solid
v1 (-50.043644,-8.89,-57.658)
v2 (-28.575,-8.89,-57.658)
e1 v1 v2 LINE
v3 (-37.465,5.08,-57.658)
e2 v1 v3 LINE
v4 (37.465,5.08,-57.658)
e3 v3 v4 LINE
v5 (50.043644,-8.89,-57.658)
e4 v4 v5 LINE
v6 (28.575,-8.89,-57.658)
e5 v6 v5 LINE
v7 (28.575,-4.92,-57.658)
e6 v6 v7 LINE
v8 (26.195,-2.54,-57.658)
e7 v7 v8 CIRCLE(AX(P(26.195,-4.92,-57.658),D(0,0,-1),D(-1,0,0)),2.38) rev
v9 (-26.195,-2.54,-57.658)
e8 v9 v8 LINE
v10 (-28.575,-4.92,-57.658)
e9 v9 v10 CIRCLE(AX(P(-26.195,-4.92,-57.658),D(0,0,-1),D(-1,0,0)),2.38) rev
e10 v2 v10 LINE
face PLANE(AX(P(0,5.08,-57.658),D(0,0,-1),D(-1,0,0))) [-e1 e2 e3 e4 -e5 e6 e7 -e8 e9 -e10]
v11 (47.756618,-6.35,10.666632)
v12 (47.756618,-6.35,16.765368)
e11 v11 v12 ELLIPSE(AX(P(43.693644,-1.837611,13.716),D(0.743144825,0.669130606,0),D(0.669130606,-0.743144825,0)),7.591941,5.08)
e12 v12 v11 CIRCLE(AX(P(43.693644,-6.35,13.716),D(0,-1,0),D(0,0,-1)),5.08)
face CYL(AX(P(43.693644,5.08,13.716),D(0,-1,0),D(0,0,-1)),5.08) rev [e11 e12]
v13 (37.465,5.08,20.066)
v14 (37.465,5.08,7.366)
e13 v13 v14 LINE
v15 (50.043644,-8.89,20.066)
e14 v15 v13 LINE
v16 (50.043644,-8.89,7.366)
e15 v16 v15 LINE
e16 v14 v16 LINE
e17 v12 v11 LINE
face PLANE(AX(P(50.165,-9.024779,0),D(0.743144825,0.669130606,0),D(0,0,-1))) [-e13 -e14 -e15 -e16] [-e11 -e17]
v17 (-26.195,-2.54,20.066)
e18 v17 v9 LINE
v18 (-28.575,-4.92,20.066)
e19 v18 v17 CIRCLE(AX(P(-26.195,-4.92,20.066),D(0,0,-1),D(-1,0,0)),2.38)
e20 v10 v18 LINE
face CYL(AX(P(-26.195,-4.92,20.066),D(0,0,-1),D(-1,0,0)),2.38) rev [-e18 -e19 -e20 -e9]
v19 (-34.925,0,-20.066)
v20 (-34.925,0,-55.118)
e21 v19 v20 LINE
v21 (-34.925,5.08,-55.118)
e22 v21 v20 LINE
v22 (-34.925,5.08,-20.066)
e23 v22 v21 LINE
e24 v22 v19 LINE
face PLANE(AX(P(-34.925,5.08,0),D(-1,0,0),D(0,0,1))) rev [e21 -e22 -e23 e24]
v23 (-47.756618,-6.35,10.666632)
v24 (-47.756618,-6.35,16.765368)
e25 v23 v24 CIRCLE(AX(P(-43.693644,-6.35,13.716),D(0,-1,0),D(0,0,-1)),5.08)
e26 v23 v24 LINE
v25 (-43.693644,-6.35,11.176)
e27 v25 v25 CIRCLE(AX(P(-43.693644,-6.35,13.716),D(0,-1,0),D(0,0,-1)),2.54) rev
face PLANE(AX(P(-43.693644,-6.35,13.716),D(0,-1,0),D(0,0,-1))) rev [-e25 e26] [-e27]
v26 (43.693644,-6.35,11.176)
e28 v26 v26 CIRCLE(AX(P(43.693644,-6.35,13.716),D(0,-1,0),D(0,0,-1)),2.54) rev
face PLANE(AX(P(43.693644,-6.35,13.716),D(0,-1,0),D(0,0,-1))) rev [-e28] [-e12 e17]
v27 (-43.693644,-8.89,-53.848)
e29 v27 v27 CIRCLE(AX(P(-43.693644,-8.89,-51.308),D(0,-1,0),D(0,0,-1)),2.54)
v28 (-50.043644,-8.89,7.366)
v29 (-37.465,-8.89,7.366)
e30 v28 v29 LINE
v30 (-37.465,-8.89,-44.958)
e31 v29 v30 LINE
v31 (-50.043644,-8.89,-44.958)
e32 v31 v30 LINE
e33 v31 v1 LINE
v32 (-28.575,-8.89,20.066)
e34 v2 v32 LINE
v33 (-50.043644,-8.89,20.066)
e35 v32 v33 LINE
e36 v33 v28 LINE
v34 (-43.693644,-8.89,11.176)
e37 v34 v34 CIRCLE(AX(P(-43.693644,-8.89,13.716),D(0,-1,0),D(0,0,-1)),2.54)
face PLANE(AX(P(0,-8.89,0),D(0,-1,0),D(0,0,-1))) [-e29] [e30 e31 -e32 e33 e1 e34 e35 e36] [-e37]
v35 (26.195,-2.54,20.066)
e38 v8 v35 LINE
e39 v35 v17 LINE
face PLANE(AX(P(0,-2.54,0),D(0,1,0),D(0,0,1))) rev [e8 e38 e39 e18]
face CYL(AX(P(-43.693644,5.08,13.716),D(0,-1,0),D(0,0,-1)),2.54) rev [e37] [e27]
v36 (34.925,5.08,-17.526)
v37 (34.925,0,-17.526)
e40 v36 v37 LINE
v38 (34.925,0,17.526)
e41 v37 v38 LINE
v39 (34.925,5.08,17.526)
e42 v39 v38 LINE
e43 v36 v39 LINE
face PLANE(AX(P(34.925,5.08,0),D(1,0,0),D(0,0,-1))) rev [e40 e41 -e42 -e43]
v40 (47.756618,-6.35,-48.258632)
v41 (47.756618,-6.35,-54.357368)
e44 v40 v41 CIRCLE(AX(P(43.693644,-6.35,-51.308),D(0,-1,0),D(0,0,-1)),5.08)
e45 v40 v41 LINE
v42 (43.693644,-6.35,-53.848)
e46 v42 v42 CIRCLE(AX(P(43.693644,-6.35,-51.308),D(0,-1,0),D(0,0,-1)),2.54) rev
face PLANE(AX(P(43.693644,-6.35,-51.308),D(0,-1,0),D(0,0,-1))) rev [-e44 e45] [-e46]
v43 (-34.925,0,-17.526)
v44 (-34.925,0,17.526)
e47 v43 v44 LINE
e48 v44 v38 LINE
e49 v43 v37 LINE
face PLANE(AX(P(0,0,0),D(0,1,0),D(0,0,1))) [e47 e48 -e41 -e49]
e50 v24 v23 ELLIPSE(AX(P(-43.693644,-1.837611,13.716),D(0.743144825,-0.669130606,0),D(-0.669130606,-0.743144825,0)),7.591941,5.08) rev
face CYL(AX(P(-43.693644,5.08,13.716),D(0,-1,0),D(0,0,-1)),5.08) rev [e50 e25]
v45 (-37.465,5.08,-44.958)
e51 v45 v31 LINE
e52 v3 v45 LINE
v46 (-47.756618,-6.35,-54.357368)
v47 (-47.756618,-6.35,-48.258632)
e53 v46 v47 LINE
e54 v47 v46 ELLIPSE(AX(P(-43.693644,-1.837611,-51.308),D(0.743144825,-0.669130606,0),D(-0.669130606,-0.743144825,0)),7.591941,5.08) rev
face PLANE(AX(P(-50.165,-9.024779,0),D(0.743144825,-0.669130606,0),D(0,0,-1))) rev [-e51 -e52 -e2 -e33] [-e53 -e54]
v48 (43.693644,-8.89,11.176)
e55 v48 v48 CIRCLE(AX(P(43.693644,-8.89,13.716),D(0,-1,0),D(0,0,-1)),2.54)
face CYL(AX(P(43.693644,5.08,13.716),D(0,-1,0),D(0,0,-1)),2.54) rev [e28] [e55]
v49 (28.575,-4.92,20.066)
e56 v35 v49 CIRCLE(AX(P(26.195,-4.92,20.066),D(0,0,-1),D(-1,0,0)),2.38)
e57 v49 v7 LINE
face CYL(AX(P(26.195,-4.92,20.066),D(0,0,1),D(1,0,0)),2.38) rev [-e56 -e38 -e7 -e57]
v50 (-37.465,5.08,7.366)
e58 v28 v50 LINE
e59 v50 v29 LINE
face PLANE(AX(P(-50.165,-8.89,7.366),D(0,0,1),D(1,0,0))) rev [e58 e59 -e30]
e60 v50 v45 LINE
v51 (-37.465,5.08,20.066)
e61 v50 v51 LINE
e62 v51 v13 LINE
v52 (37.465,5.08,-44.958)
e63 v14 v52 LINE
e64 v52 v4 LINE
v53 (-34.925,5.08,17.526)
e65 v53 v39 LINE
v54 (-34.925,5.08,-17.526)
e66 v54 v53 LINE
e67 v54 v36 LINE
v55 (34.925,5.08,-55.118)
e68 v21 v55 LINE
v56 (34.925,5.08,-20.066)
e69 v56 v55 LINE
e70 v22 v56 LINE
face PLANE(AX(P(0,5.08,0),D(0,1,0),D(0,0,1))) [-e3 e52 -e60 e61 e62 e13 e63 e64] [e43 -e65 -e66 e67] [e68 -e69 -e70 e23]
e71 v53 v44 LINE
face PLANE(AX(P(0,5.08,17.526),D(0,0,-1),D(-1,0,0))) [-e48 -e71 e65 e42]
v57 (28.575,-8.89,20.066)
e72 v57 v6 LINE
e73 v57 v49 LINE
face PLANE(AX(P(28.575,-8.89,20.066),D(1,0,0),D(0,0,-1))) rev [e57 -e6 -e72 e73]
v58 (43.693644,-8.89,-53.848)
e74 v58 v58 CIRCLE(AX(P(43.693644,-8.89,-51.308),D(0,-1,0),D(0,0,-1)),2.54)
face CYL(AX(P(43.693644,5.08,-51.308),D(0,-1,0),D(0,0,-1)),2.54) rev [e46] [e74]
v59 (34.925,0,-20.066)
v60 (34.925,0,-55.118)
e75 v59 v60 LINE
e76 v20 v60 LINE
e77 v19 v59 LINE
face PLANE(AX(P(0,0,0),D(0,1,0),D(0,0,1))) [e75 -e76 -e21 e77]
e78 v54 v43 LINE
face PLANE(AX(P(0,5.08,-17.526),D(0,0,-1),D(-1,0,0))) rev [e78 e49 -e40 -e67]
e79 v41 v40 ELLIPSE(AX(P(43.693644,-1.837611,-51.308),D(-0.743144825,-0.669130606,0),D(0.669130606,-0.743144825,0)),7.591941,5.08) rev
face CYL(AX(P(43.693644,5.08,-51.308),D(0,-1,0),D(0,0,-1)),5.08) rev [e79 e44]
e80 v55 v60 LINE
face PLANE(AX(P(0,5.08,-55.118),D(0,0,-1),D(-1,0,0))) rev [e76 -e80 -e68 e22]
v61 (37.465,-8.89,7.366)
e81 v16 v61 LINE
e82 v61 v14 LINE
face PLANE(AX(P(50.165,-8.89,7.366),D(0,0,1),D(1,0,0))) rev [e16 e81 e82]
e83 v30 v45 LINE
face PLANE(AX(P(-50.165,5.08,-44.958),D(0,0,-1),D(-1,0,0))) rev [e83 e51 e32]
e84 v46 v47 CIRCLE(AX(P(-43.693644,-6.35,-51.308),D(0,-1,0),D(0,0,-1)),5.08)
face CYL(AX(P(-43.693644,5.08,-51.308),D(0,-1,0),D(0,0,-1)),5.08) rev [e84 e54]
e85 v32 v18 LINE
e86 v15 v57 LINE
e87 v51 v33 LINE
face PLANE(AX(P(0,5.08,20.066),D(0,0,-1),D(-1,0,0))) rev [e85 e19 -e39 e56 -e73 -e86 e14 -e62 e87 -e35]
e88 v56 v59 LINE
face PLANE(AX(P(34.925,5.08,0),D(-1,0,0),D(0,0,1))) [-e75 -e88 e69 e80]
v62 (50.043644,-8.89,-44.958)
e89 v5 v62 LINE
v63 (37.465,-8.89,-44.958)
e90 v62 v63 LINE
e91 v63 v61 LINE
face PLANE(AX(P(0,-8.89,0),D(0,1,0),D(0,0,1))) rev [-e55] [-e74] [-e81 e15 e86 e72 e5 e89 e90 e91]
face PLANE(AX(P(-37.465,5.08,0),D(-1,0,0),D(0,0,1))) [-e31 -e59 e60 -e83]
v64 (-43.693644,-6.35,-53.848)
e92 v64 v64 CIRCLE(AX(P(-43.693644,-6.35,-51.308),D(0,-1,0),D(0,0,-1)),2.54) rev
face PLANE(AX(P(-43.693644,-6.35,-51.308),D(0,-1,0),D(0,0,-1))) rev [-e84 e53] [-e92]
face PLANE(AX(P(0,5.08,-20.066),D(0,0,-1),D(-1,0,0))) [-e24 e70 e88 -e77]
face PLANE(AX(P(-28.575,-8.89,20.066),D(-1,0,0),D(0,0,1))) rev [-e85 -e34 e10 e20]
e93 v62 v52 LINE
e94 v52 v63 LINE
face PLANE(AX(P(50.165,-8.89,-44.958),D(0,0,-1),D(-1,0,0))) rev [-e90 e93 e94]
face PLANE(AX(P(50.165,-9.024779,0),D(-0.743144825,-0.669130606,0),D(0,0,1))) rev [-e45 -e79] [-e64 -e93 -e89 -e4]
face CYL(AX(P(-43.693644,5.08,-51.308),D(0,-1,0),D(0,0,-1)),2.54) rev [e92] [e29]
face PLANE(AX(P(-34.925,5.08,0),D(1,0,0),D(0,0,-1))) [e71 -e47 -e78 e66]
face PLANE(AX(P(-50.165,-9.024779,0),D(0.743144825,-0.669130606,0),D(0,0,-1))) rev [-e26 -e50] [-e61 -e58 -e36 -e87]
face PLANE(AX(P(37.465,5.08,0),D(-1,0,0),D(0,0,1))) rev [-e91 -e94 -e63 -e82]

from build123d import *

# Parameters (mm, degrees)
SKETCH1_W           = 74.93
SKETCH1_H           = 40.132
SKETCH1_W_2         = 69.85
SKETCH1_H_2         = 35.052
BOSS_EXTRUDE1_DEPTH = 5.08
SKETCH2_W           = 74.93
SKETCH2_H           = 77.724
BOSS_EXTRUDE2_DEPTH = 2.54
SKETCH3_W           = 8.89
SKETCH3_H           = 77.724
BOSS_EXTRUDE3_DEPTH = 6.35
SKETCH5_W           = 12.7
SKETCH5_H           = 13.97
BOSS_EXTRUDE5_DEPTH = 12.7
SKETCH6_W           = 12.7
SKETCH6_H           = 13.97
BOSS_EXTRUDE6_DEPTH = 12.7
CHAMFER2_SIZE       = 12.7
CHAMFER2_SIZE_2     = 14.104778938
SKETCH7_R           = 2.54
CUT_EXTRUDE1_DEPTH  = 78.614252678
CUT_EXTRUDE2_START  = -2.54
SKETCH8_R           = 5.08
CUT_EXTRUDE2_DEPTH  = 76.074252678
FILLET1_R           = 2.38


with BuildPart() as part:
    # Sketch1 → Boss-Extrude1 (new body)
    # profile 1 of 2: a face of its own
    with BuildSketch(Plane(origin=(0, 0, 0), x_dir=(1, 0, 0), z_dir=(0, 1, 0))):
        Polygon((-37.465, 57.658), (-37.465, 20.066), (-34.925, 20.066), (-34.925, 55.118), (34.925, 55.118), (34.925, 20.066), (37.465, 20.066), (37.465, 57.658), align=None)
    # profile 2 of 2: a face of its own
    with BuildSketch(Plane(origin=(0, 0, 0), x_dir=(1, 0, 0), z_dir=(0, 1, 0))):
        Rectangle(SKETCH1_W, SKETCH1_H)
        Rectangle(SKETCH1_W_2, SKETCH1_H_2, mode=Mode.SUBTRACT)
    extrude(amount=BOSS_EXTRUDE1_DEPTH)

    # Sketch2 → Boss-Extrude2 (add)
    with BuildSketch(Plane.XZ):
        with Locations((0, -18.796)):
            Rectangle(SKETCH2_W, SKETCH2_H)
    extrude(amount=BOSS_EXTRUDE2_DEPTH)

    # Sketch3 → Boss-Extrude3 (add)
    with BuildSketch(Plane(origin=(0, -2.54, 0), x_dir=(-1, 0, 0), z_dir=(0, -1, 0))):
        with Locations((-33.02, 18.796)):
            Rectangle(SKETCH3_W, SKETCH3_H)
        with Locations((33.02, 18.796)):
            Rectangle(SKETCH3_W, SKETCH3_H)
    extrude(amount=BOSS_EXTRUDE3_DEPTH)

    # Sketch5 → Boss-Extrude5 (add)
    with BuildSketch(Plane(origin=(37.465, 0, 0), x_dir=(0, 0, -1), z_dir=(1, 0, 0))):
        with Locations((51.308, -1.905)):
            Rectangle(SKETCH5_W, SKETCH5_H)
        with Locations((-13.716, -1.905)):
            Rectangle(SKETCH5_W, SKETCH5_H)
    extrude(amount=BOSS_EXTRUDE5_DEPTH)

    # Sketch6 → Boss-Extrude6 (add)
    with BuildSketch(Plane.ZY.offset(37.465)):
        with Locations((-51.308, -1.905)):
            Rectangle(SKETCH6_W, SKETCH6_H)
        with Locations((13.716, -1.905)):
            Rectangle(SKETCH6_W, SKETCH6_H)
    extrude(amount=BOSS_EXTRUDE6_DEPTH)

    # Chamfer2
    # the kernel refuses this chamfer: 14.104778938, 12.7 mm, written as the material it takes off along each edge
    with BuildSketch(Plane(origin=(50.165, 5.08, -28.95640044), x_dir=(-0.9994864482690293, 0.03204434000819555, 0), z_dir=(0, 0, 1))) as chamfer2_piece_1:
        Polygon((CHAMFER2_SIZE * 0.999486448269, CHAMFER2_SIZE * 0.0320443400082), (-CHAMFER2_SIZE_2 * 0.0320443400089, CHAMFER2_SIZE_2 * 0.999486448292), (0, 0), align=None)
    extrude(amount=85.34480088, mode=Mode.SUBTRACT)
    with BuildSketch(Plane(origin=(50.165, 5.08, -8.63559956), x_dir=(-0.9994864482690293, 0.03204434000819555, 0), z_dir=(0, 0, -1)), Plane(origin=(-50.165, 5.08, -28.95640044), x_dir=(0.9994864482690293, 0.03204434000819555, 0), z_dir=(0, 0, 1)), Plane(origin=(-50.165, 5.08, -93.98040044), x_dir=(0.9994864482690293, 0.03204434000819555, 0), z_dir=(0, 0, 1))) as chamfer2_piece_2:
        Polygon((CHAMFER2_SIZE * 0.999486448269, -CHAMFER2_SIZE * 0.0320443400082), (-CHAMFER2_SIZE_2 * 0.0320443400089, -CHAMFER2_SIZE_2 * 0.999486448292), (0, 0), align=None)
    extrude(amount=85.34480088, mode=Mode.SUBTRACT)

    # Sketch7 → Cut-Extrude1 (cut, through all)
    with BuildSketch(Plane(origin=(0, -8.89, 0), x_dir=(-1, 0, 0), z_dir=(0, -1, 0))):
        with Locations(Location((-43.693644499, 51.308, 0), (0, 0, 90))):
            Circle(SKETCH7_R)
        with Locations(Location((-43.693644499, -13.716, 0), (0, 0, 90))):
            Circle(SKETCH7_R)
        with Locations(Location((43.693644499, -13.716, 0), (0, 0, 90))):
            Circle(SKETCH7_R)
        with Locations(Location((43.693644499, 51.308, 0), (0, 0, 90))):
            Circle(SKETCH7_R)
    extrude(amount=-CUT_EXTRUDE1_DEPTH, mode=Mode.SUBTRACT)

    # Sketch8 → Cut-Extrude2 (cut, through all)
    with BuildSketch(Plane(origin=(0, -8.89, 0), x_dir=(-1, 0, 0), z_dir=(0, -1, 0)).offset(CUT_EXTRUDE2_START)):
        with Locations((-43.693644499, 51.308)):
            Circle(SKETCH8_R)
        with Locations((-43.693644499, -13.716)):
            Circle(SKETCH8_R)
        with Locations((43.693644499, -13.716)):
            Circle(SKETCH8_R)
        with Locations((43.693644499, 51.308)):
            Circle(SKETCH8_R)
    extrude(amount=-CUT_EXTRUDE2_DEPTH, mode=Mode.SUBTRACT)

    # Fillet1
    fillet1_edges = [part.edges().sort_by_distance(p)[0] for p in [
        (28.575, -2.54, -18.796),
        (-28.575, -2.54, -18.796),
    ]]
    fillet(fillet1_edges, radius=FILLET1_R)


solid = part.part
